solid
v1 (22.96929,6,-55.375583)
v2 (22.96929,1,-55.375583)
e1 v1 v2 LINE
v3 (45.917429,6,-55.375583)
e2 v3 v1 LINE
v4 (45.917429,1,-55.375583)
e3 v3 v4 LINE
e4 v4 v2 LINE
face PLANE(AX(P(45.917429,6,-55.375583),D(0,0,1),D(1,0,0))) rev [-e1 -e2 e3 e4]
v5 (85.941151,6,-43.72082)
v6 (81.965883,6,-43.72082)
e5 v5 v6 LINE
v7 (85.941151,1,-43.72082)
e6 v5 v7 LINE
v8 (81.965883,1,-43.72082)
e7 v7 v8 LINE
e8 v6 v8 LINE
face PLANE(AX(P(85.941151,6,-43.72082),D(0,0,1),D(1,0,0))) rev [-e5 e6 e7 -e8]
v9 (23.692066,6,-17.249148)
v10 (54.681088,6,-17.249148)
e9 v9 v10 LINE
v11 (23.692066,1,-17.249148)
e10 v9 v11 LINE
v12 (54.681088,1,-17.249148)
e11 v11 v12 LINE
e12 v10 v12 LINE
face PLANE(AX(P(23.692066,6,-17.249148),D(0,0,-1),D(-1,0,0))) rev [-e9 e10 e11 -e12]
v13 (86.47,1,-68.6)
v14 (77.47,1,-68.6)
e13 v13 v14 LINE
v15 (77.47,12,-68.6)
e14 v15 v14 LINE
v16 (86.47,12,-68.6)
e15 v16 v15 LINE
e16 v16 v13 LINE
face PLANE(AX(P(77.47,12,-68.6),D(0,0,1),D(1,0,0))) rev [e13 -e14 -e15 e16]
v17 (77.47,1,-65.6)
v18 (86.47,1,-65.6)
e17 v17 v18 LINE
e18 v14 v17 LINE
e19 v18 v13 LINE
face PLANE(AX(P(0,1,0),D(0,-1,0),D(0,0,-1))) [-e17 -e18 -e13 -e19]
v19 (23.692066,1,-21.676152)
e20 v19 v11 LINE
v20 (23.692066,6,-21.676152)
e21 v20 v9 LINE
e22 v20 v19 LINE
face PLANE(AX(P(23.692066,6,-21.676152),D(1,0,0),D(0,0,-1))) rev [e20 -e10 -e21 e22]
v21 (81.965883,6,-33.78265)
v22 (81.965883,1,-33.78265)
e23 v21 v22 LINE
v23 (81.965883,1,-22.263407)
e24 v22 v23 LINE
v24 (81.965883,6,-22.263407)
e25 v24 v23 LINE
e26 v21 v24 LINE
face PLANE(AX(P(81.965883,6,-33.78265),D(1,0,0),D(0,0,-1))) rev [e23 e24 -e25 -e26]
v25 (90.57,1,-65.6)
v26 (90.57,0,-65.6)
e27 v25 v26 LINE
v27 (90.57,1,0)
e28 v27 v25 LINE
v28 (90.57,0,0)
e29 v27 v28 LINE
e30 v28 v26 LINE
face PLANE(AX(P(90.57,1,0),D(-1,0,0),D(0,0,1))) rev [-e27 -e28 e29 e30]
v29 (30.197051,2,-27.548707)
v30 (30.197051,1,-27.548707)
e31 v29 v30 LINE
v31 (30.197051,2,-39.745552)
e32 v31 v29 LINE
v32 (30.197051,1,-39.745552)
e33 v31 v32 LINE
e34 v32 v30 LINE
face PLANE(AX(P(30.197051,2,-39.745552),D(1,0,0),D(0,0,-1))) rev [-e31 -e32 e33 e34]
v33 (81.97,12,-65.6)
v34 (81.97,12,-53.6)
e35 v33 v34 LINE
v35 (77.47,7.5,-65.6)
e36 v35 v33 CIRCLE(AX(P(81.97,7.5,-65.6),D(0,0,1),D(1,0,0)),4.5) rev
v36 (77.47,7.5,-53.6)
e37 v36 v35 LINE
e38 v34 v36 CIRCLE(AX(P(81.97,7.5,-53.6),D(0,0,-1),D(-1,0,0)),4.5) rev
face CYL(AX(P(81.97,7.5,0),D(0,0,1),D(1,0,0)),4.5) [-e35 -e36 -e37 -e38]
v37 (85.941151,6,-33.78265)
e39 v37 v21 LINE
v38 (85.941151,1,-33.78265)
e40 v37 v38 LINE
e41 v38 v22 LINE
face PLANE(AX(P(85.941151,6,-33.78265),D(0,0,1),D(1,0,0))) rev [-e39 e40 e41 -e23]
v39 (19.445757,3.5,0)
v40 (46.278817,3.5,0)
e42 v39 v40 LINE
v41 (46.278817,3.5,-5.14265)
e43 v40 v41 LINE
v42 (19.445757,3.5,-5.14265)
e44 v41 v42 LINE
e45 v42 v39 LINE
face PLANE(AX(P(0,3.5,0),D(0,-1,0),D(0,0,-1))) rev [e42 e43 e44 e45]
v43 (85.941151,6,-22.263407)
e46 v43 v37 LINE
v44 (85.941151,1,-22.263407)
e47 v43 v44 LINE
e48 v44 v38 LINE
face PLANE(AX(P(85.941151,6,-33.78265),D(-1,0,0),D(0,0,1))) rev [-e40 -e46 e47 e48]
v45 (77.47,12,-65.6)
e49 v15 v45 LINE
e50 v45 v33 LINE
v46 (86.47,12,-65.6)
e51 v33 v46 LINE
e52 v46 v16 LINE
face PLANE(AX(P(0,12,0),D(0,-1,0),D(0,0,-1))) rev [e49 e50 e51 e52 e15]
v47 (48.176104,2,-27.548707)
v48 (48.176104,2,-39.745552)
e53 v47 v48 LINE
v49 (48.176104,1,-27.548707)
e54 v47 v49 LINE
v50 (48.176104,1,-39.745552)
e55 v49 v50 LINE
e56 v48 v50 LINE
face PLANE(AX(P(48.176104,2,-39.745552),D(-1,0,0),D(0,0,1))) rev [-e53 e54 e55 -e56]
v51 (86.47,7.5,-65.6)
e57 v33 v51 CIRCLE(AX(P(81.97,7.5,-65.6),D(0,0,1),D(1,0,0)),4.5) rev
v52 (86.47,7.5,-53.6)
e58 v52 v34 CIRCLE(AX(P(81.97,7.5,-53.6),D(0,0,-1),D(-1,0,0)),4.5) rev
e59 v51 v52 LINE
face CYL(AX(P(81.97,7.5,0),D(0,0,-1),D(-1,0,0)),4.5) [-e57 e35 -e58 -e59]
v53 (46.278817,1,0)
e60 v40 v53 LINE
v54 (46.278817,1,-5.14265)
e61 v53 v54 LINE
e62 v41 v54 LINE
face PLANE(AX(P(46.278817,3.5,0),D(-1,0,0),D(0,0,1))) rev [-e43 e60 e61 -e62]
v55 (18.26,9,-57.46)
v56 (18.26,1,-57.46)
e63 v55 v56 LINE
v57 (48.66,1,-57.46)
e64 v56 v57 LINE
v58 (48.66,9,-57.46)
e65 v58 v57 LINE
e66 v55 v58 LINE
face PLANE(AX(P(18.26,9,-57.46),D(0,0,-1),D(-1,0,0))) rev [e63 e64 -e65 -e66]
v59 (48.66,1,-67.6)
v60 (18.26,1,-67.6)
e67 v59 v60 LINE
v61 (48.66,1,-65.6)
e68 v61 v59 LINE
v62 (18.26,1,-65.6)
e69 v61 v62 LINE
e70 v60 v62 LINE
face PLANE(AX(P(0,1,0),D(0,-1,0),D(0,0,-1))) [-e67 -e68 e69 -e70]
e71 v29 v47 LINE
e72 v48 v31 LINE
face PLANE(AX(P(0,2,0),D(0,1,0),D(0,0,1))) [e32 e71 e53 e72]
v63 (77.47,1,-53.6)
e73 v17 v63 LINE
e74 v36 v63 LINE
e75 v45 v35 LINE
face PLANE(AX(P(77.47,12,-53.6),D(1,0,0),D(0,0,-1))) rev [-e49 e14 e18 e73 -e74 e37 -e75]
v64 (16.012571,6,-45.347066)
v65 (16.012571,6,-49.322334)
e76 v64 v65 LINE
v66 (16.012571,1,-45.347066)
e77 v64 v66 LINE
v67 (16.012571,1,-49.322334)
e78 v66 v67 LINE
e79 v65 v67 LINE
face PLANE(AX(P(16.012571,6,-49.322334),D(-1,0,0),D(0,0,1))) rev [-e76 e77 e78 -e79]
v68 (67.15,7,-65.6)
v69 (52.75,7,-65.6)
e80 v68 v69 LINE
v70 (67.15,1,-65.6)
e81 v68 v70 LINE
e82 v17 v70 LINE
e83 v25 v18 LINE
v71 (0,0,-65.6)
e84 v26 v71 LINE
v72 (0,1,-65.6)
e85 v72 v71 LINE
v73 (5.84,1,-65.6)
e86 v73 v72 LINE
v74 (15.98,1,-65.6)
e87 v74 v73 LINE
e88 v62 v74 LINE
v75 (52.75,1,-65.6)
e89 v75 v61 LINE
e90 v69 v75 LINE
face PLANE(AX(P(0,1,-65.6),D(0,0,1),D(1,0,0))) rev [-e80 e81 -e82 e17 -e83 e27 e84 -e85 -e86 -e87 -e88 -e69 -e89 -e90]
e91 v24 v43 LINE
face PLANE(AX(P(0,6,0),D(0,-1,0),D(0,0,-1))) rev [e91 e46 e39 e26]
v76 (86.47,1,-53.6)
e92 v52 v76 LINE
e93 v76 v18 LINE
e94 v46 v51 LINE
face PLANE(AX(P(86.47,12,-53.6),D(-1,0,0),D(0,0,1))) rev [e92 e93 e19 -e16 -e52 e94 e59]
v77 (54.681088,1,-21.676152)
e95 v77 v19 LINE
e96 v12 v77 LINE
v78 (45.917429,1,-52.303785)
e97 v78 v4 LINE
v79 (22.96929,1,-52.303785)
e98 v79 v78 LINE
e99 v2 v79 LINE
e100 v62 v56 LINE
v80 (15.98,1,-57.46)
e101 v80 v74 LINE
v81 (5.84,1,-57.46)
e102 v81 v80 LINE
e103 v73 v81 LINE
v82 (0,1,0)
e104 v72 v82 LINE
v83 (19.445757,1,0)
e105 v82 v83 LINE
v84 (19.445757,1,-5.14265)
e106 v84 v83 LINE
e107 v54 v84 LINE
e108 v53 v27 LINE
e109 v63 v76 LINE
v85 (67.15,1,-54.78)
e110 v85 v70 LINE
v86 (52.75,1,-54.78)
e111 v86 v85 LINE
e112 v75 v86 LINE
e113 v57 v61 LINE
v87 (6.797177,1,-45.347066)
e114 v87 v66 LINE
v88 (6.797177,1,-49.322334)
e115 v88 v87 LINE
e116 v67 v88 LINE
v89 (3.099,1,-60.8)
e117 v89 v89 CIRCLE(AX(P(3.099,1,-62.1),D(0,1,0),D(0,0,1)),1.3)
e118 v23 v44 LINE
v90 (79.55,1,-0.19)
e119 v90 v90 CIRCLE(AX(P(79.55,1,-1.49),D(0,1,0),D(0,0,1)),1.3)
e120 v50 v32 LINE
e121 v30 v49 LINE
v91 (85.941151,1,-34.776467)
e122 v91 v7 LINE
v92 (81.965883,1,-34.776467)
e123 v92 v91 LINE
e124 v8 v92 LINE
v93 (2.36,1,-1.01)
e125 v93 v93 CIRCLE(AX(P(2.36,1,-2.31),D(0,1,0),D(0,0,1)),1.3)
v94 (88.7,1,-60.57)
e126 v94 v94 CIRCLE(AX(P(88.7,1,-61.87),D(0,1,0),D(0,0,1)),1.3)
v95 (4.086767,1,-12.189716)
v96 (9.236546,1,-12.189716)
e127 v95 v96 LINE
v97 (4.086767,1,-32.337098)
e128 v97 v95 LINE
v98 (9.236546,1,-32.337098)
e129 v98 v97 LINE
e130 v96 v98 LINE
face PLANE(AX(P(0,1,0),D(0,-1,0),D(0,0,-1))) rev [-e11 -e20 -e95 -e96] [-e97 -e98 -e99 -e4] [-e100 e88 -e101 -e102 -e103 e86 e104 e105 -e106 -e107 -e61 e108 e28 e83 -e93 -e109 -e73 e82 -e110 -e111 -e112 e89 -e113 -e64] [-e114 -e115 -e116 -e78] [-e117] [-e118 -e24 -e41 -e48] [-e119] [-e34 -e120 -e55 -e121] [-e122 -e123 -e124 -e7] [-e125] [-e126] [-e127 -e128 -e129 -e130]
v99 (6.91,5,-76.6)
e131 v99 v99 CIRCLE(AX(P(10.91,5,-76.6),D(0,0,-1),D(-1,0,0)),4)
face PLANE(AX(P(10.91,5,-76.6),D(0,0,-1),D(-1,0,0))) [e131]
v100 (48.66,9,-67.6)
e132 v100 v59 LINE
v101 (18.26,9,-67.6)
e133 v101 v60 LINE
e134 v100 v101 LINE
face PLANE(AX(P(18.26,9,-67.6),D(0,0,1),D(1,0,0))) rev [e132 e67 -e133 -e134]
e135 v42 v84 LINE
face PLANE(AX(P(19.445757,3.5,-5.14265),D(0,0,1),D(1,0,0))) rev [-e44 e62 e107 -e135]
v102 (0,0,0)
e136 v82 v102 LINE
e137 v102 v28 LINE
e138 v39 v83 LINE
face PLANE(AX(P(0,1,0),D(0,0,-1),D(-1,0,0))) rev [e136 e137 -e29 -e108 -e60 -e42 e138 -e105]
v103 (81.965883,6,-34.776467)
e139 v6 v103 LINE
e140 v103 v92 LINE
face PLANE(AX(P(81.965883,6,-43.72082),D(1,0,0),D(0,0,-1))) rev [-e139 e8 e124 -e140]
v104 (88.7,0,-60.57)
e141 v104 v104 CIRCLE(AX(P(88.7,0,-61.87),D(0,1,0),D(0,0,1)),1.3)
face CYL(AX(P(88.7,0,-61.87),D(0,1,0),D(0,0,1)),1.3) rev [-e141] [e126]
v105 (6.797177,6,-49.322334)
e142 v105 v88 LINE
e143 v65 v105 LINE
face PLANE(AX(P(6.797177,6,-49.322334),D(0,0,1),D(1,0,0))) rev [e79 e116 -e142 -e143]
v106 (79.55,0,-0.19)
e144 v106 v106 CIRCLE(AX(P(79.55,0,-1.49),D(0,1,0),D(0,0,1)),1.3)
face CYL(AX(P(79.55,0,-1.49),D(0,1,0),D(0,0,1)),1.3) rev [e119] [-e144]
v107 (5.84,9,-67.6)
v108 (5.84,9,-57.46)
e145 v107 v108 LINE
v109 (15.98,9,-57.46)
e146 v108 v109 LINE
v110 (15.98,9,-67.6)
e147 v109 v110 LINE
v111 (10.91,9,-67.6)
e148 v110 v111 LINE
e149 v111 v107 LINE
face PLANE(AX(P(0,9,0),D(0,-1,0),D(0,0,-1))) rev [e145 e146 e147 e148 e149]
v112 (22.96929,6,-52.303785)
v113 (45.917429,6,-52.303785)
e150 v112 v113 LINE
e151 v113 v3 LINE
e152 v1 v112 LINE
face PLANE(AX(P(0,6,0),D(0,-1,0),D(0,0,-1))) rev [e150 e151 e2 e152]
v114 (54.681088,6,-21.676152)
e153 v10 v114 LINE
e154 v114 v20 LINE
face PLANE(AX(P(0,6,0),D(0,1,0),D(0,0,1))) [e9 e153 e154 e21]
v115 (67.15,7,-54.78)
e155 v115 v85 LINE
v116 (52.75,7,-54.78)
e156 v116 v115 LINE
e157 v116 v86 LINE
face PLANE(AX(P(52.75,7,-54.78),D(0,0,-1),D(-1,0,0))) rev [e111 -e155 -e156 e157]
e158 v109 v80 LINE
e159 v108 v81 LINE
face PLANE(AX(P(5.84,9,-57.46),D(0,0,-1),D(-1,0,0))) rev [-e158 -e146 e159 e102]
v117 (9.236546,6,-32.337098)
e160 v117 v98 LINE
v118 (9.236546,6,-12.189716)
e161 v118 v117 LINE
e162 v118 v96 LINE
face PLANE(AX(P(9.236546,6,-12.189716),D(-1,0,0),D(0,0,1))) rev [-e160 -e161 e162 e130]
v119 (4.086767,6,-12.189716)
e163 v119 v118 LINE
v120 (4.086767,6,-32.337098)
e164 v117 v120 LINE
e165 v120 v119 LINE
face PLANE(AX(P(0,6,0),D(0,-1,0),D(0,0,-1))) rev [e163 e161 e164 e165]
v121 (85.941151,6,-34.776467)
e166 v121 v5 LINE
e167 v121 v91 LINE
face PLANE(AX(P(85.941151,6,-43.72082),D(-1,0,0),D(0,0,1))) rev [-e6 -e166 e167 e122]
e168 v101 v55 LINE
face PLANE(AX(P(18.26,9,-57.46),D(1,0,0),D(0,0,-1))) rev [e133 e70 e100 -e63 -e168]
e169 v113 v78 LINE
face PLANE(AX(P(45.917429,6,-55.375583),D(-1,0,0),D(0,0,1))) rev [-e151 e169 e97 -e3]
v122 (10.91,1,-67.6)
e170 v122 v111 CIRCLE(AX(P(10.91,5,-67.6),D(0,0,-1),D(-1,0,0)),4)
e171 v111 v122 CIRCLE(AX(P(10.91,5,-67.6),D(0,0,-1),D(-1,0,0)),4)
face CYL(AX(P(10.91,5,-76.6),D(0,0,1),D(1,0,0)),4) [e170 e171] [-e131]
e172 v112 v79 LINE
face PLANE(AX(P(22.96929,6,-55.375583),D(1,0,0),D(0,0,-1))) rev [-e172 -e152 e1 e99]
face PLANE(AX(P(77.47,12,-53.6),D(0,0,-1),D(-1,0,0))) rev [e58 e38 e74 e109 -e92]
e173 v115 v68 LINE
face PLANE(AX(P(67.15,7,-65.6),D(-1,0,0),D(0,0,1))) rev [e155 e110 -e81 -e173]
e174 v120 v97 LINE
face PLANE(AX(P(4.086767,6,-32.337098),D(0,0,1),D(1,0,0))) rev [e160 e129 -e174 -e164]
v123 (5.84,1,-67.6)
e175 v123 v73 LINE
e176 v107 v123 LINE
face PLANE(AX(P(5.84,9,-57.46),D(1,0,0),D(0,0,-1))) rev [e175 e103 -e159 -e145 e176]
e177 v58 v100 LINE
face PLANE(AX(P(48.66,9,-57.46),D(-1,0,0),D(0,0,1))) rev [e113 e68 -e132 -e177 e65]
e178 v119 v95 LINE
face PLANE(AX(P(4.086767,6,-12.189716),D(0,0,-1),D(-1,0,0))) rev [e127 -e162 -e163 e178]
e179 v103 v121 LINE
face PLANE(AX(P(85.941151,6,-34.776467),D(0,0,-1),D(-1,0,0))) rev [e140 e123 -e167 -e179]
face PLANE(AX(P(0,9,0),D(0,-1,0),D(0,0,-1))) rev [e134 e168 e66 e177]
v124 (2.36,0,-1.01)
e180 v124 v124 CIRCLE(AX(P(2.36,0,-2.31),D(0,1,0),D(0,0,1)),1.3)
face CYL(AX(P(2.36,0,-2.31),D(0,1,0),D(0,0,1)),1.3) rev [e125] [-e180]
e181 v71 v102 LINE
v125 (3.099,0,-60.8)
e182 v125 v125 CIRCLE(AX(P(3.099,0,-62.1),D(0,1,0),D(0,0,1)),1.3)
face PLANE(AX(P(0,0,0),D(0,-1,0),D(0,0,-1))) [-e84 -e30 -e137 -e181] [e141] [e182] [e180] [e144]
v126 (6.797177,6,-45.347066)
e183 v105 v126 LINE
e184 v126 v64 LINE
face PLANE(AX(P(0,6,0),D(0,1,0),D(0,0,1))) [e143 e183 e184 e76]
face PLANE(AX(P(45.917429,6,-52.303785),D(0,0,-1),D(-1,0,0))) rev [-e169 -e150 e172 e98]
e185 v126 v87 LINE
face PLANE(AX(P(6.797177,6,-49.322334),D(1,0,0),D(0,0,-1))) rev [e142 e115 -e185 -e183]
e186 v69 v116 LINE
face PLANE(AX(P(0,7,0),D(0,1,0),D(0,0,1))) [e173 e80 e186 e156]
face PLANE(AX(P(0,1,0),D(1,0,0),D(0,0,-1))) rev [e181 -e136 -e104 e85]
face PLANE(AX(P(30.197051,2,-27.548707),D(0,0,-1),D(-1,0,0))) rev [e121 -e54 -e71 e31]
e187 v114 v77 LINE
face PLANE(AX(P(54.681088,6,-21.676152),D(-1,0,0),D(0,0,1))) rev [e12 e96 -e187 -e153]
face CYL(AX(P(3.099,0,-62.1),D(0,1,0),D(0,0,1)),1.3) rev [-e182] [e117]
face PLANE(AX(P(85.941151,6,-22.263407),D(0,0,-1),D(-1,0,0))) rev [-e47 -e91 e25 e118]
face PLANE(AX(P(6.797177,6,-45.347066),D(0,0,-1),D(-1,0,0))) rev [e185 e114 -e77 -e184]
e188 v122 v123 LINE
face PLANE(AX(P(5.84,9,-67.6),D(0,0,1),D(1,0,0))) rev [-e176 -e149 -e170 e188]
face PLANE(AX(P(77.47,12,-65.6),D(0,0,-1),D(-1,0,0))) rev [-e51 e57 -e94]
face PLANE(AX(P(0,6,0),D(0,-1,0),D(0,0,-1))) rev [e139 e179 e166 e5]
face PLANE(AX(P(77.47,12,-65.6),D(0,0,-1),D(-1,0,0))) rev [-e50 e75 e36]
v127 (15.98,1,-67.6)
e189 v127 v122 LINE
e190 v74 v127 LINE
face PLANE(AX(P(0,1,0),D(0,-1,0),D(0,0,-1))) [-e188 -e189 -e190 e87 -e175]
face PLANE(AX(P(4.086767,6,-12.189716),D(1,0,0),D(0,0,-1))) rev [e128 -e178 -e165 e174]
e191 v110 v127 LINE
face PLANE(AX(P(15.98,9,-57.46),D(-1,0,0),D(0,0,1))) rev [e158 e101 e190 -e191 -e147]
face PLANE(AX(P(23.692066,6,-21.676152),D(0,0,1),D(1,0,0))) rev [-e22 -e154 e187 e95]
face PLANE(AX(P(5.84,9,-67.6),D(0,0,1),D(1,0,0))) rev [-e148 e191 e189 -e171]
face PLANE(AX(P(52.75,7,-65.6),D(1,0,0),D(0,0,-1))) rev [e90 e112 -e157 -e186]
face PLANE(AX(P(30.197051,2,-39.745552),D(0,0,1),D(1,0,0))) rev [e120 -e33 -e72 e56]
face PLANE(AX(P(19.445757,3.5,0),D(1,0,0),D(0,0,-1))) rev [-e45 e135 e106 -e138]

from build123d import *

# Parameters (mm, degrees)
SKETCH1_W            = 90.57
SKETCH1_H            = 65.6
BOSS_EXTRUDE1_DEPTH  = 1
SKETCH2_R            = 1.3
CUT_EXTRUDE1_DEPTH   = 112.835973193
SKETCH3_W            = 10.14
SKETCH3_H            = 10.14
SKETCH3_W_2          = 30.4
BOSS_EXTRUDE2_DEPTH  = 8
SKETCH4_W            = 14.4
SKETCH4_H            = 10.82
BOSS_EXTRUDE3_DEPTH  = 6
SKETCH5_W            = 9
SKETCH5_H            = 12
BOSS_EXTRUDE4_DEPTH  = 11
FILLET2_R            = 4.5
SKETCH7_W            = 9
SKETCH7_H            = 3
BOSS_EXTRUDE5_DEPTH  = 11
SKETCH8_R            = 4
BOSS_EXTRUDE6_DEPTH  = 9
SKETCH9_W            = 22.948138565
SKETCH9_H            = 3.071798075
SKETCH9_W_2          = 9.215394227
SKETCH9_H_2          = 3.975268097
SKETCH9_W_3          = 5.149779126
SKETCH9_H_3          = 20.147381496
SKETCH9_W_4          = 3.975268098
SKETCH9_H_4          = 8.94435322
SKETCH9_H_5          = 11.519242784
BOSS_EXTRUDE7_DEPTH  = 5
SKETCH10_W           = 17.979053442
SKETCH10_H           = 12.196845301
BOSS_EXTRUDE8_DEPTH  = 1
SKETCH12_W           = 26.83305966
SKETCH12_H           = 5.142650184
BOSS_EXTRUDE9_DEPTH  = 2.5
SKETCH13_W           = 30.989021763
SKETCH13_H           = 4.427003109
BOSS_EXTRUDE10_DEPTH = 5


with BuildPart() as part:
    # Sketch1 → Boss-Extrude1 (new body)
    with BuildSketch(Plane(origin=(0, 0, 0), x_dir=(1, 0, 0), z_dir=(0, 1, 0))):
        with Locations((45.285, 32.8)):
            Rectangle(SKETCH1_W, SKETCH1_H)
    extrude(amount=BOSS_EXTRUDE1_DEPTH)

    # Sketch2 → Cut-Extrude1 (cut, through all)
    with BuildSketch(Plane(origin=(0, 1, 0), x_dir=(1, 0, 0), z_dir=(0, 1, 0))):
        with Locations(Location((2.36, 2.31, 0), (0, 0, 270))):
            Circle(SKETCH2_R)
        with Locations(Location((3.099, 62.1, 0), (0, 0, 270))):
            Circle(SKETCH2_R)
        with Locations(Location((88.7, 61.87, 0), (0, 0, 270))):
            Circle(SKETCH2_R)
        with Locations(Location((79.55, 1.49, 0), (0, 0, 270))):
            Circle(SKETCH2_R)
    extrude(amount=-CUT_EXTRUDE1_DEPTH, mode=Mode.SUBTRACT)

    # Sketch3 → Boss-Extrude2 (add)
    with BuildSketch(Plane(origin=(0, 1, 0), x_dir=(1, 0, 0), z_dir=(0, 1, 0))):
        with Locations((10.91, 62.53)):
            Rectangle(SKETCH3_W, SKETCH3_H)
        with Locations((33.46, 62.53)):
            Rectangle(SKETCH3_W_2, SKETCH3_H)
    extrude(amount=BOSS_EXTRUDE2_DEPTH)

    # Sketch4 → Boss-Extrude3 (add)
    with BuildSketch(Plane(origin=(0, 1, 0), x_dir=(1, 0, 0), z_dir=(0, 1, 0))):
        with Locations((59.95, 60.19)):
            Rectangle(SKETCH4_W, SKETCH4_H)
    extrude(amount=BOSS_EXTRUDE3_DEPTH)

    # Sketch5 → Boss-Extrude4 (add)
    with BuildSketch(Plane(origin=(0, 1, 0), x_dir=(1, 0, 0), z_dir=(0, 1, 0))):
        with Locations((81.97, 59.6)):
            Rectangle(SKETCH5_W, SKETCH5_H)
    extrude(amount=BOSS_EXTRUDE4_DEPTH)

    # Fillet2
    fillet2_edges = [part.edges().sort_by_distance(p)[0] for p in [
        (86.47, 12, -59.6),
        (77.47, 12, -59.6),
    ]]
    fillet(fillet2_edges, radius=FILLET2_R - 0.0001)  # a hair under: the kernel refuses the full size

    # Sketch7 → Boss-Extrude5 (add)
    with BuildSketch(Plane(origin=(0, 1, 0), x_dir=(1, 0, 0), z_dir=(0, 1, 0))):
        with Locations((81.97, 67.1)):
            Rectangle(SKETCH7_W, SKETCH7_H)
    extrude(amount=BOSS_EXTRUDE5_DEPTH)

    # Sketch8 → Boss-Extrude6 (add)
    with BuildSketch(Plane(origin=(0, 0, -67.6), x_dir=(-1, 0, 0), z_dir=(0, 0, -1))):
        with Locations(Location((-10.91, 5, 0), (0, 0, 270))):
            Circle(SKETCH8_R)
    extrude(amount=BOSS_EXTRUDE6_DEPTH)

    # Sketch9 → Boss-Extrude7 (add)
    with BuildSketch(Plane(origin=(0, 1, 0), x_dir=(1, 0, 0), z_dir=(0, 1, 0))):
        with Locations((34.443359734, 53.839684383)):
            Rectangle(SKETCH9_W, SKETCH9_H)
        with Locations((11.404874166, 47.334700223)):
            Rectangle(SKETCH9_W_2, SKETCH9_H_2)
        with Locations((6.661656549, 22.263407105)):
            Rectangle(SKETCH9_W_3, SKETCH9_H_3)
        with Locations((83.953516952, 39.248643523)):
            Rectangle(SKETCH9_W_4, SKETCH9_H_4)
        with Locations((83.953516952, 28.023028497)):
            Rectangle(SKETCH9_W_4, SKETCH9_H_5)
    extrude(amount=BOSS_EXTRUDE7_DEPTH)

    # Sketch10 → Boss-Extrude8 (add)
    with BuildSketch(Plane(origin=(0, 1, 0), x_dir=(1, 0, 0), z_dir=(0, 1, 0))):
        with Locations((39.18657735, 33.647129386)):
            Rectangle(SKETCH10_W, SKETCH10_H)
    extrude(amount=BOSS_EXTRUDE8_DEPTH)

    # Sketch12 → Boss-Extrude9 (add)
    with BuildSketch(Plane(origin=(0, 1, 0), x_dir=(1, 0, 0), z_dir=(0, 1, 0))):
        with Locations((32.862287194, 2.571325092)):
            Rectangle(SKETCH12_W, SKETCH12_H)
    extrude(amount=BOSS_EXTRUDE9_DEPTH)

    # Sketch13 → Boss-Extrude10 (add)
    with BuildSketch(Plane(origin=(0, 1, 0), x_dir=(1, 0, 0), z_dir=(0, 1, 0))):
        with Locations((39.186577349, 19.462650037)):
            Rectangle(SKETCH13_W, SKETCH13_H)
    extrude(amount=BOSS_EXTRUDE10_DEPTH)


solid = part.part
